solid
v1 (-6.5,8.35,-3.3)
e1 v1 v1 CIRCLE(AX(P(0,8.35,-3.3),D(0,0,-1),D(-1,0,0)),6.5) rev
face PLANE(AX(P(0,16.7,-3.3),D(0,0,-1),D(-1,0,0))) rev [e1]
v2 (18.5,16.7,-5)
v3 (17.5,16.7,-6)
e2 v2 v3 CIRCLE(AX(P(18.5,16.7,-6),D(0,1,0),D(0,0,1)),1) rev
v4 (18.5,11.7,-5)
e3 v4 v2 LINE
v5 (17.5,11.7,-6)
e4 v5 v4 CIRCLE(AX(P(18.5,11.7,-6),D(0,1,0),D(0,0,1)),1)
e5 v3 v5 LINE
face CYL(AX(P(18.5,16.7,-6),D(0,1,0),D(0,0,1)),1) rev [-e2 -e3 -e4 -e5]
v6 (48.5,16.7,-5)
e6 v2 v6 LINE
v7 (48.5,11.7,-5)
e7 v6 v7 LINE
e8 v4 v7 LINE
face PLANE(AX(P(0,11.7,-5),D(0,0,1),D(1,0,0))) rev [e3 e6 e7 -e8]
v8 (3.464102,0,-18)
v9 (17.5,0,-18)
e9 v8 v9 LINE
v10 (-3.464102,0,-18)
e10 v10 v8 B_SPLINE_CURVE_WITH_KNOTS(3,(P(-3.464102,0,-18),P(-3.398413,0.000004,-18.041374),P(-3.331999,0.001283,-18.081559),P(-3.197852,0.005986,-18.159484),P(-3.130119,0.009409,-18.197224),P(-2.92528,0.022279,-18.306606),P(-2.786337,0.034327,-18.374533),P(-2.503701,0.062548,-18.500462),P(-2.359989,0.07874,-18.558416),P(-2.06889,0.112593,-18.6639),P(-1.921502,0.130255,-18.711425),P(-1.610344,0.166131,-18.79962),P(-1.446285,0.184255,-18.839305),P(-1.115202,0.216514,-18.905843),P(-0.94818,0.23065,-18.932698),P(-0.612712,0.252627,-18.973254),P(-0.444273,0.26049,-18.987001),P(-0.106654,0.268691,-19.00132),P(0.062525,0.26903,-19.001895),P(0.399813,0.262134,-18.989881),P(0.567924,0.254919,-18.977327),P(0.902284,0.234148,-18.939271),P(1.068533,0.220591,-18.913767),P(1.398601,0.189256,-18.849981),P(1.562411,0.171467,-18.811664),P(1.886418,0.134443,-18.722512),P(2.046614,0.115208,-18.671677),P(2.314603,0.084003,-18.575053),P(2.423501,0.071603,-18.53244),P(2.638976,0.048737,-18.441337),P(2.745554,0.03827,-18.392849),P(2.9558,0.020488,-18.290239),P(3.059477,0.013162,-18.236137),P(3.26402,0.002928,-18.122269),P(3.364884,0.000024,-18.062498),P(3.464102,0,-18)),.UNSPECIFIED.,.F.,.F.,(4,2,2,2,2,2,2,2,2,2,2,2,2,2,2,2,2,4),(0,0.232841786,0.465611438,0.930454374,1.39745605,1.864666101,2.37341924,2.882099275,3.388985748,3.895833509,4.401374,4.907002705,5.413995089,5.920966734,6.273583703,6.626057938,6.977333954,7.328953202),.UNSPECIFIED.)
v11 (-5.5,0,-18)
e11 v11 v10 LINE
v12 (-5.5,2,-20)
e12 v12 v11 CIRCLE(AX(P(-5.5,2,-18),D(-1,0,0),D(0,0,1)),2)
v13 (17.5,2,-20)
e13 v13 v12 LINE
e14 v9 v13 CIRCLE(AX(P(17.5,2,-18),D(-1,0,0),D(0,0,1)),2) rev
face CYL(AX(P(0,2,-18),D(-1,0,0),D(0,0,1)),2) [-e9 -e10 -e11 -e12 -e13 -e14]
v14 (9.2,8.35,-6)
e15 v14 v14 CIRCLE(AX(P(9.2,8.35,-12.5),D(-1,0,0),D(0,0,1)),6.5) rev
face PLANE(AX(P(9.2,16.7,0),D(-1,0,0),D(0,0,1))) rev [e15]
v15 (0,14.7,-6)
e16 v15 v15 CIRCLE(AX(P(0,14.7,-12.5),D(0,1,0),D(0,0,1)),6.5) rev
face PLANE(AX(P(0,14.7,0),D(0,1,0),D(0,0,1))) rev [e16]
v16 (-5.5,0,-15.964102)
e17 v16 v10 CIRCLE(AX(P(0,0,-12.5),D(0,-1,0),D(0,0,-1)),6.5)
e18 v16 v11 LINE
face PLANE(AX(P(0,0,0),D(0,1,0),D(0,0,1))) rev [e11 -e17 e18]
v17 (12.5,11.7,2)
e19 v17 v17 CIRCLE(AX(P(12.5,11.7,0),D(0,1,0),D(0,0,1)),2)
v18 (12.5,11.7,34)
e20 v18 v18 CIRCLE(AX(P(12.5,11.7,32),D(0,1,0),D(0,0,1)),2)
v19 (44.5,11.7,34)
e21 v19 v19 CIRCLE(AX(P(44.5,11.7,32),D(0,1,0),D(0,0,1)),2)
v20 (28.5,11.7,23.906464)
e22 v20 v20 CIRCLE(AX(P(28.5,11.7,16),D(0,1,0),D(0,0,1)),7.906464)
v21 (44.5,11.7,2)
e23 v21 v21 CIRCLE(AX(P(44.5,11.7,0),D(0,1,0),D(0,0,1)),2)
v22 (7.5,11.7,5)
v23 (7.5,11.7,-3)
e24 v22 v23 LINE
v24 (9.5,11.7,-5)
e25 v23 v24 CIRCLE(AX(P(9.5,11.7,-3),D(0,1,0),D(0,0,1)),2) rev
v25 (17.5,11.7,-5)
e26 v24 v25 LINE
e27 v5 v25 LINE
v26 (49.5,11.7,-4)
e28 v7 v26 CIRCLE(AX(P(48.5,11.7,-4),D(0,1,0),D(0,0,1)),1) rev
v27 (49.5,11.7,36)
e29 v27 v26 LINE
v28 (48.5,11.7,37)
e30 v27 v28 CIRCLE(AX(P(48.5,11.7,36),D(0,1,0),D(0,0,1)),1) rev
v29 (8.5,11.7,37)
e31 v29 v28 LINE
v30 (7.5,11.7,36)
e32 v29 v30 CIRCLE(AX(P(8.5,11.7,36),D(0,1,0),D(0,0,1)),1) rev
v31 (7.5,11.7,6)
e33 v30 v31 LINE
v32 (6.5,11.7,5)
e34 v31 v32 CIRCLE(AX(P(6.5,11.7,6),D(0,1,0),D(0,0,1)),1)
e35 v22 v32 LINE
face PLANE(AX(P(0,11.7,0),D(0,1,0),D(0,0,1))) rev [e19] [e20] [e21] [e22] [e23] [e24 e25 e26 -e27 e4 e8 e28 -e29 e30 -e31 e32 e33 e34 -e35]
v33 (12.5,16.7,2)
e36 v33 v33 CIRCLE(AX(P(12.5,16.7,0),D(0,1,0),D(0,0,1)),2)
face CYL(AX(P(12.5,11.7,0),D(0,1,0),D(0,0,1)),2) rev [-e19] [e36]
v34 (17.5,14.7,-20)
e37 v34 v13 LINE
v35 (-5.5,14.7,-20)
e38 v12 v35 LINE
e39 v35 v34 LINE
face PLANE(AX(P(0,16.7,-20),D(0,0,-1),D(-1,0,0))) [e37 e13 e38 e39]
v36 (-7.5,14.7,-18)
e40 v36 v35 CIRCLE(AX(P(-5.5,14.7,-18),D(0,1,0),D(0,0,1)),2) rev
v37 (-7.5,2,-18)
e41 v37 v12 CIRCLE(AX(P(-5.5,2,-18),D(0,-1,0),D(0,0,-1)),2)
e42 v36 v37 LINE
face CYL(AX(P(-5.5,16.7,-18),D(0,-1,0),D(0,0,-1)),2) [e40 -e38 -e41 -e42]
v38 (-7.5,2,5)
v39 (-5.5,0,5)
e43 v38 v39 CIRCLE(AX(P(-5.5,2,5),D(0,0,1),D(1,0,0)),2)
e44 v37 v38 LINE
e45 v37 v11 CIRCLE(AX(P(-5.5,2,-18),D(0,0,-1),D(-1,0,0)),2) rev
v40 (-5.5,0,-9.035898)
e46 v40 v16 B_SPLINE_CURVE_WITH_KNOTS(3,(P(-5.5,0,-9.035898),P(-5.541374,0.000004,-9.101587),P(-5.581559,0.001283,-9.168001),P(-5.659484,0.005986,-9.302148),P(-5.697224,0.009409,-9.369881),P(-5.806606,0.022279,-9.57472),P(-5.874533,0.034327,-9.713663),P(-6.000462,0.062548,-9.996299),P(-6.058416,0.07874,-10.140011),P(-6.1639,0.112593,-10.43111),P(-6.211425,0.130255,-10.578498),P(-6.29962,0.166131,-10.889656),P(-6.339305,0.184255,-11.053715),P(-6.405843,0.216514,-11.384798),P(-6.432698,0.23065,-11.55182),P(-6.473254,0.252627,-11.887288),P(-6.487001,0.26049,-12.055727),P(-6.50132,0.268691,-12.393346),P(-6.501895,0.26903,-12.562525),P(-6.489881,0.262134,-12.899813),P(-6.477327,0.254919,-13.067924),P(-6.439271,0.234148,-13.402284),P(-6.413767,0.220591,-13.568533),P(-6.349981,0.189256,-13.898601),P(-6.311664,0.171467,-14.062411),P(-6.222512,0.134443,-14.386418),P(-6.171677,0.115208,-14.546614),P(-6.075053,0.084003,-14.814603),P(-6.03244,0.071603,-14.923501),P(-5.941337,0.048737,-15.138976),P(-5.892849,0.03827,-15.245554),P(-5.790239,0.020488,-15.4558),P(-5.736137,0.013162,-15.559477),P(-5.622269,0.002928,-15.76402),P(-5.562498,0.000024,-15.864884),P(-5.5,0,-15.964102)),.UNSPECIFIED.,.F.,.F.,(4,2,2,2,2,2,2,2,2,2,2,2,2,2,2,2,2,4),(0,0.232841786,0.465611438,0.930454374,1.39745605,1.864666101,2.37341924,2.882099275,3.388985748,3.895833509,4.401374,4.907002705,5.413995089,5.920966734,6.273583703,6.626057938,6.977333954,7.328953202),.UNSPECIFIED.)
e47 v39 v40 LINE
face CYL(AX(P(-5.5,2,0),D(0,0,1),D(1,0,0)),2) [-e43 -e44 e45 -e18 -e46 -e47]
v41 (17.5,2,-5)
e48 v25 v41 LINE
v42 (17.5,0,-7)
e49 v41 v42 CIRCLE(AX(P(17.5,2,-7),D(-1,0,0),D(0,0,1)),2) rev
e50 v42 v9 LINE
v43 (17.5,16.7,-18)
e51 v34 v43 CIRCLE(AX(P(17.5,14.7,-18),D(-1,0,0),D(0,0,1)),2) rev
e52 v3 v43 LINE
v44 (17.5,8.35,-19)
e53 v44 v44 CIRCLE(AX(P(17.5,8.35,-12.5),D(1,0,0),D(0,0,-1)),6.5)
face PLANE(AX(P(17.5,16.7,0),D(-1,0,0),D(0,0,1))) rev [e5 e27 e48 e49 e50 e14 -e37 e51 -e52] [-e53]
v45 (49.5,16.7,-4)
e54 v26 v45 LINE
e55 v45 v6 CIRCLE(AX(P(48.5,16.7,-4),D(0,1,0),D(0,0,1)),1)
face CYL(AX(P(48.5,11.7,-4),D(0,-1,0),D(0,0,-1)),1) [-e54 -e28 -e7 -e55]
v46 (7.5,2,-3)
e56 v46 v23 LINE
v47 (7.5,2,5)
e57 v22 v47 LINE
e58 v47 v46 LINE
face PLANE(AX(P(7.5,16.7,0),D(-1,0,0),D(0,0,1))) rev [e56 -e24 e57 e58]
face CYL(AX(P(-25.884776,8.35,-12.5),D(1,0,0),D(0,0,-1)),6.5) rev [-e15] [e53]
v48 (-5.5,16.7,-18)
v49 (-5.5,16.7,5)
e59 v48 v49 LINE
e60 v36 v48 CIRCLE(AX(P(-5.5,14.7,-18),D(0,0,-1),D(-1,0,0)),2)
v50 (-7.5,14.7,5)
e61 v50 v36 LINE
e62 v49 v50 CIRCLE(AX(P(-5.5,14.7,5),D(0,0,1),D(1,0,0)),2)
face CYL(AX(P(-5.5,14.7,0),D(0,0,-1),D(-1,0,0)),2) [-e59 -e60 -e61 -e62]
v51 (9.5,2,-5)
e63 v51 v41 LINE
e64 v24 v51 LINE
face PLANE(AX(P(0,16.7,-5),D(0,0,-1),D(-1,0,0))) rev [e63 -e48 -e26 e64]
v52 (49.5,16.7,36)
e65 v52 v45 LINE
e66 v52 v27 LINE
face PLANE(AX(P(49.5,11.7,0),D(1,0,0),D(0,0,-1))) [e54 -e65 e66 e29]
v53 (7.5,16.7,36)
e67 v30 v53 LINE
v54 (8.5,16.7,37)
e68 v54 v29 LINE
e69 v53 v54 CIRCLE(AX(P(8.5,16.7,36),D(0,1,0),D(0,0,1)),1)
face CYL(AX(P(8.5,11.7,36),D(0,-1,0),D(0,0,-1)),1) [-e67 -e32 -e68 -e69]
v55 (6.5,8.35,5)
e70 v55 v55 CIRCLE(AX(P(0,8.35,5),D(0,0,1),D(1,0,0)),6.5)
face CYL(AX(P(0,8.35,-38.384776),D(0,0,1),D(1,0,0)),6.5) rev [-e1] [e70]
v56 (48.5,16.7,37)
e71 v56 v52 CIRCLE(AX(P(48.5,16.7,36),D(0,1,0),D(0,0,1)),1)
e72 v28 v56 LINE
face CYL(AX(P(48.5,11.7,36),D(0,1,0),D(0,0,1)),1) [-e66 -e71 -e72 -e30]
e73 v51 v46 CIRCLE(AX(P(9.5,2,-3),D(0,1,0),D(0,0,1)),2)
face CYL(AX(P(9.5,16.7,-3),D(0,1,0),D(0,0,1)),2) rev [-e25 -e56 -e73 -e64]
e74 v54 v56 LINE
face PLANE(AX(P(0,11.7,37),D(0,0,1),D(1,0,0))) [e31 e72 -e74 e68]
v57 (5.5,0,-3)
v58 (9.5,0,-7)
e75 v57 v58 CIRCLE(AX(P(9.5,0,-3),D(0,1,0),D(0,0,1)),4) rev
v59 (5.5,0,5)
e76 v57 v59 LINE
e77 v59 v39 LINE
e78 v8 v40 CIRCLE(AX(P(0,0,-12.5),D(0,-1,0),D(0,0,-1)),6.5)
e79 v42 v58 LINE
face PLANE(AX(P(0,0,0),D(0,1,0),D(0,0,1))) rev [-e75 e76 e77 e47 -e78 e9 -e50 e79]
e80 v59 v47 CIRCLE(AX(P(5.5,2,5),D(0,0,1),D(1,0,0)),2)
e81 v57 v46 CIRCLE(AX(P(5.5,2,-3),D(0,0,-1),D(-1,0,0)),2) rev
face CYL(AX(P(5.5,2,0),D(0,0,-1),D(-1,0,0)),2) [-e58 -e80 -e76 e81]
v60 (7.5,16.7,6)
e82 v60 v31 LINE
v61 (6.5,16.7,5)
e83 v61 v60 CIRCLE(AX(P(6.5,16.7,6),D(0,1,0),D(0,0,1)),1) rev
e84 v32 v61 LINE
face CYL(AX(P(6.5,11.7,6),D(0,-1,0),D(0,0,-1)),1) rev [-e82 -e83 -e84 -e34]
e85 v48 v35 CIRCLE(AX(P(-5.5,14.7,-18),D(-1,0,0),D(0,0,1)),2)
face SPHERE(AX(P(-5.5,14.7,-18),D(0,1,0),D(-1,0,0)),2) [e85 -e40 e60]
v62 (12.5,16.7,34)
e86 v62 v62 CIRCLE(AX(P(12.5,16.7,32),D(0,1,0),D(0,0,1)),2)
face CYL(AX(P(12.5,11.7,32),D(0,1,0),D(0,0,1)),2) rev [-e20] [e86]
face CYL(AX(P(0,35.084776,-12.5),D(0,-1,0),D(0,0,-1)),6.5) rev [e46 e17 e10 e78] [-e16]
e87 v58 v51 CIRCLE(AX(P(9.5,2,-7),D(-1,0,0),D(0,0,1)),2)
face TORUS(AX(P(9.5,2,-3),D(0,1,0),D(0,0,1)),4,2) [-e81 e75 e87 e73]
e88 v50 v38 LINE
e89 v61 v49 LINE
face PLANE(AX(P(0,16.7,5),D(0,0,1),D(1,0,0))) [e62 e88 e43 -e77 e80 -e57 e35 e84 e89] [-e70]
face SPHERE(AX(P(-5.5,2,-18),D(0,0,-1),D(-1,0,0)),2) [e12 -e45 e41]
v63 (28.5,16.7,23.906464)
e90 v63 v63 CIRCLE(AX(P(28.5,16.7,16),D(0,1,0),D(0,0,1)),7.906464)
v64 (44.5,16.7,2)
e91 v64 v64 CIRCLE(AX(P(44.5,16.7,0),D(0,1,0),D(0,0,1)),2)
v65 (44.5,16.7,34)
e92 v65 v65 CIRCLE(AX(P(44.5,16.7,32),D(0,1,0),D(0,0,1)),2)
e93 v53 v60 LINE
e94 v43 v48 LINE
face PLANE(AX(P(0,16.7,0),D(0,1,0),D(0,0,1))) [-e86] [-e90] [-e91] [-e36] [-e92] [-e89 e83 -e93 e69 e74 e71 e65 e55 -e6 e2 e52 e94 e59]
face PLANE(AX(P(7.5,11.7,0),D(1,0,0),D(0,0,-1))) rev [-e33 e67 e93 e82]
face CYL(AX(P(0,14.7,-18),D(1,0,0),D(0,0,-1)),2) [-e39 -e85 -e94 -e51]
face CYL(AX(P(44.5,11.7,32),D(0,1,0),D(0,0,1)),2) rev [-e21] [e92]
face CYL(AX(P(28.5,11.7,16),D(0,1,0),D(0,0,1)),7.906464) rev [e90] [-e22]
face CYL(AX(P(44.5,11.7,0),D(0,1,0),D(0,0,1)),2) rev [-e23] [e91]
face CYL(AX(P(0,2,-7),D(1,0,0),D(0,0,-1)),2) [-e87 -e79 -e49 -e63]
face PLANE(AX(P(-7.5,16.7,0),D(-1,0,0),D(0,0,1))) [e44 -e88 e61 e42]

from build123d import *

# Parameters (mm, degrees)
SKETCH1_W           = 15
SKETCH1_H           = 10
SKETCH1_H_2         = 15
SKETCH1_W_2         = 10
BOSS_EXTRUDE1_DEPTH = 16.7
SKETCH2_R           = 6.5
CUT_EXTRUDE1_DEPTH  = 8.3
SKETCH3_R           = 6.5
CUT_EXTRUDE2_DEPTH  = 8.3
SKETCH4_R           = 6.5
CUT_EXTRUDE3_DEPTH  = 14.7
FILLET8_R           = 2
SKETCH5_W           = 42
SKETCH5_H           = 42
SKETCH5_R           = 2
SKETCH5_R_2         = 7.906463766
BOSS_EXTRUDE3_DEPTH = 5
FILLET9_R           = 1


with BuildPart() as part:
    # Sketch1 → Boss-Extrude1 (new body)
    with BuildSketch(Plane(origin=(0, 0, 0), x_dir=(1, 0, 0), z_dir=(0, 1, 0))):
        Rectangle(SKETCH1_W, SKETCH1_H)
        with Locations((0, 12.5)):
            Rectangle(SKETCH1_W, SKETCH1_H_2)
        with Locations((12.5, 12.5)):
            Rectangle(SKETCH1_W_2, SKETCH1_H_2)
    extrude(amount=BOSS_EXTRUDE1_DEPTH)

    # Sketch2 → Cut-Extrude1 (cut)
    with BuildSketch(Plane.XY.offset(5)):
        with Locations((0, 8.35)):
            Circle(SKETCH2_R)
    extrude(amount=-CUT_EXTRUDE1_DEPTH, mode=Mode.SUBTRACT)

    # Sketch3 → Cut-Extrude2 (cut)
    with BuildSketch(Plane(origin=(17.5, 0, 0), x_dir=(0, 0, -1), z_dir=(1, 0, 0))):
        with Locations((12.5, 8.35)):
            Circle(SKETCH3_R)
    extrude(amount=-CUT_EXTRUDE2_DEPTH, mode=Mode.SUBTRACT)

    # Sketch4 → Cut-Extrude3 (cut)
    with BuildSketch(Plane.XZ):
        with Locations(Location((0, -12.5, 0), (0, 0, 270))):
            Circle(SKETCH4_R)
    extrude(amount=-CUT_EXTRUDE3_DEPTH, mode=Mode.SUBTRACT)

    # Fillet8
    # the kernel refuses this fillet: 2 mm, written as the material it adds along each edge
    with BuildSketch(Plane(origin=(7.5, 0, -5), x_dir=(0, 0, 1), z_dir=(0, 1, 0))) as fillet8_piece_1:
        with BuildLine():
            CenterArc((FILLET8_R, FILLET8_R), FILLET8_R, 180, 90)
            Line((0, FILLET8_R), (0, 0))
            Line((0, 0), (FILLET8_R, 0))
        make_face()
    extrude(amount=16.7)
    # the kernel refuses this fillet: 2 mm, written as the material it takes off along each edge
    with BuildSketch(Plane(origin=(-5.5, 2, -18), x_dir=(0, 0, -1), z_dir=(-1, 0, 0))) as fillet8_2_piece_1_section:
        Polygon((0, 0), (FILLET8_R, 0), (FILLET8_R, FILLET8_R), (0, FILLET8_R), align=None)
    fillet8_2_piece_1 = extrude(amount=FILLET8_R, mode=Mode.PRIVATE)
    fillet8_2_piece_1 = fillet8_2_piece_1 - Plane(origin=(-5.5, 2, -18), x_dir=(0, 0.7071067811865475, 0.7071067811865475), z_dir=(-1, 0, 0)) * Sphere(FILLET8_R, mode=Mode.PRIVATE)
    add(fillet8_2_piece_1, mode=Mode.SUBTRACT)
    with BuildSketch(Plane(origin=(-5.5, 14.7, -18), x_dir=(0, 1, 0), z_dir=(-1, 0, 0))) as fillet8_2_piece_2_section:
        Polygon((0, 0), (FILLET8_R, 0), (FILLET8_R, FILLET8_R), (0, FILLET8_R), align=None)
    fillet8_2_piece_2 = extrude(amount=FILLET8_R, mode=Mode.PRIVATE)
    fillet8_2_piece_2 = fillet8_2_piece_2 - Plane(origin=(-5.5, 14.7, -18), x_dir=(0, -0.7071067811865475, 0.7071067811865475), z_dir=(-1, 0, 0)) * Sphere(FILLET8_R, mode=Mode.PRIVATE)
    add(fillet8_2_piece_2, mode=Mode.SUBTRACT)
    with BuildSketch(Plane(origin=(-7.5, 0, -18), x_dir=(0, 1, 0), z_dir=(0, 0, 1)), Plane(origin=(22.5, 16.7, -20), x_dir=(0, 0, 1), z_dir=(-1, 0, 0)), Plane(origin=(-7.5, 16.7, 10), x_dir=(0, -1, 0), z_dir=(0, 0, -1)), Plane(origin=(22.5, 0, -20), x_dir=(0, 1, 0), z_dir=(-1, 0, 0))) as fillet8_2_piece_3:
        with BuildLine():
            CenterArc((FILLET8_R, -FILLET8_R), FILLET8_R, 90, 90)
            Line((0, -FILLET8_R), (0, 0))
            Line((0, 0), (FILLET8_R, 0))
        make_face()
    extrude(amount=28, mode=Mode.SUBTRACT)
    with BuildSketch(Plane(origin=(-7.5, 2, -20), x_dir=(0, 0, 1), z_dir=(0, 1, 0))) as fillet8_2_piece_4:
        with BuildLine():
            CenterArc((FILLET8_R, FILLET8_R), FILLET8_R, 180, 90)
            Line((0, FILLET8_R), (0, 0))
            Line((0, 0), (FILLET8_R, 0))
        make_face()
    extrude(amount=12.7, mode=Mode.SUBTRACT)
    # the kernel refuses this fillet: 2 mm, written as the material it takes off along each edge
    with BuildSketch(Plane(origin=(9.5, 0, -5), x_dir=(0, 0, -1), z_dir=(1, 0, 0))) as fillet8_3_piece_1:
        with BuildLine():
            CenterArc((FILLET8_R, FILLET8_R), FILLET8_R, 180, 90)
            Line((0, FILLET8_R), (0, 0))
            Line((0, 0), (FILLET8_R, 0))
        make_face()
    extrude(amount=13, mode=Mode.SUBTRACT)
    with BuildSketch(Plane(origin=(7.5, 0, -3), x_dir=(-1, 0, 0), z_dir=(0, 0, 1))) as fillet8_3_piece_2:
        with BuildLine():
            CenterArc((FILLET8_R, -FILLET8_R), FILLET8_R, 90, 90)
            Line((0, -FILLET8_R), (0, 0))
            Line((0, 0), (FILLET8_R, 0))
        make_face()
    extrude(amount=13, mode=Mode.SUBTRACT)
    with BuildSketch(Plane(origin=(9.5, 0, -3), x_dir=(-1, 0, 0), z_dir=(0, 0, 1))) as fillet8_3_piece_3:
        with BuildLine():
            CenterArc((2 + FILLET8_R, -FILLET8_R), FILLET8_R, 90, 90)
            Line((2, -FILLET8_R), (2, 0))
            Line((2, 0), (2 + FILLET8_R, 0))
        make_face()
    revolve(axis=Axis((9.5, 0, -3), (0, -1, 0)), revolution_arc=90, mode=Mode.SUBTRACT)

    # Sketch5 → Boss-Extrude3 (add)
    with BuildSketch(Plane(origin=(0, 16.7, 0), x_dir=(1, 0, 0), z_dir=(0, 1, 0))):
        with Locations((28.5, -16)):
            Rectangle(SKETCH5_W, SKETCH5_H)
        with Locations(Location((12.5, 0, 0), (0, 0, 270))):
            Circle(SKETCH5_R, mode=Mode.SUBTRACT)
        with Locations(Location((12.5, -32, 0), (0, 0, 270))):
            Circle(SKETCH5_R, mode=Mode.SUBTRACT)
        with Locations(Location((44.5, -32, 0), (0, 0, 270))):
            Circle(SKETCH5_R, mode=Mode.SUBTRACT)
        with Locations(Location((44.5, 0, 0), (0, 0, 270))):
            Circle(SKETCH5_R, mode=Mode.SUBTRACT)
        with Locations(Location((28.5, -16, 0), (0, 0, 270))):
            Circle(SKETCH5_R_2, mode=Mode.SUBTRACT)
    extrude(amount=-BOSS_EXTRUDE3_DEPTH)

    # Fillet9
    fillet9_edges = [part.edges().sort_by_distance(p)[0] for p in [
        (17.5, 14.2, -5),
        (7.5, 14.2, 5),
        (49.5, 14.2, 37),
        (7.5, 14.2, 37),
        (49.5, 14.2, -5),
    ]]
    fillet(fillet9_edges, radius=FILLET9_R)


solid = part.part
